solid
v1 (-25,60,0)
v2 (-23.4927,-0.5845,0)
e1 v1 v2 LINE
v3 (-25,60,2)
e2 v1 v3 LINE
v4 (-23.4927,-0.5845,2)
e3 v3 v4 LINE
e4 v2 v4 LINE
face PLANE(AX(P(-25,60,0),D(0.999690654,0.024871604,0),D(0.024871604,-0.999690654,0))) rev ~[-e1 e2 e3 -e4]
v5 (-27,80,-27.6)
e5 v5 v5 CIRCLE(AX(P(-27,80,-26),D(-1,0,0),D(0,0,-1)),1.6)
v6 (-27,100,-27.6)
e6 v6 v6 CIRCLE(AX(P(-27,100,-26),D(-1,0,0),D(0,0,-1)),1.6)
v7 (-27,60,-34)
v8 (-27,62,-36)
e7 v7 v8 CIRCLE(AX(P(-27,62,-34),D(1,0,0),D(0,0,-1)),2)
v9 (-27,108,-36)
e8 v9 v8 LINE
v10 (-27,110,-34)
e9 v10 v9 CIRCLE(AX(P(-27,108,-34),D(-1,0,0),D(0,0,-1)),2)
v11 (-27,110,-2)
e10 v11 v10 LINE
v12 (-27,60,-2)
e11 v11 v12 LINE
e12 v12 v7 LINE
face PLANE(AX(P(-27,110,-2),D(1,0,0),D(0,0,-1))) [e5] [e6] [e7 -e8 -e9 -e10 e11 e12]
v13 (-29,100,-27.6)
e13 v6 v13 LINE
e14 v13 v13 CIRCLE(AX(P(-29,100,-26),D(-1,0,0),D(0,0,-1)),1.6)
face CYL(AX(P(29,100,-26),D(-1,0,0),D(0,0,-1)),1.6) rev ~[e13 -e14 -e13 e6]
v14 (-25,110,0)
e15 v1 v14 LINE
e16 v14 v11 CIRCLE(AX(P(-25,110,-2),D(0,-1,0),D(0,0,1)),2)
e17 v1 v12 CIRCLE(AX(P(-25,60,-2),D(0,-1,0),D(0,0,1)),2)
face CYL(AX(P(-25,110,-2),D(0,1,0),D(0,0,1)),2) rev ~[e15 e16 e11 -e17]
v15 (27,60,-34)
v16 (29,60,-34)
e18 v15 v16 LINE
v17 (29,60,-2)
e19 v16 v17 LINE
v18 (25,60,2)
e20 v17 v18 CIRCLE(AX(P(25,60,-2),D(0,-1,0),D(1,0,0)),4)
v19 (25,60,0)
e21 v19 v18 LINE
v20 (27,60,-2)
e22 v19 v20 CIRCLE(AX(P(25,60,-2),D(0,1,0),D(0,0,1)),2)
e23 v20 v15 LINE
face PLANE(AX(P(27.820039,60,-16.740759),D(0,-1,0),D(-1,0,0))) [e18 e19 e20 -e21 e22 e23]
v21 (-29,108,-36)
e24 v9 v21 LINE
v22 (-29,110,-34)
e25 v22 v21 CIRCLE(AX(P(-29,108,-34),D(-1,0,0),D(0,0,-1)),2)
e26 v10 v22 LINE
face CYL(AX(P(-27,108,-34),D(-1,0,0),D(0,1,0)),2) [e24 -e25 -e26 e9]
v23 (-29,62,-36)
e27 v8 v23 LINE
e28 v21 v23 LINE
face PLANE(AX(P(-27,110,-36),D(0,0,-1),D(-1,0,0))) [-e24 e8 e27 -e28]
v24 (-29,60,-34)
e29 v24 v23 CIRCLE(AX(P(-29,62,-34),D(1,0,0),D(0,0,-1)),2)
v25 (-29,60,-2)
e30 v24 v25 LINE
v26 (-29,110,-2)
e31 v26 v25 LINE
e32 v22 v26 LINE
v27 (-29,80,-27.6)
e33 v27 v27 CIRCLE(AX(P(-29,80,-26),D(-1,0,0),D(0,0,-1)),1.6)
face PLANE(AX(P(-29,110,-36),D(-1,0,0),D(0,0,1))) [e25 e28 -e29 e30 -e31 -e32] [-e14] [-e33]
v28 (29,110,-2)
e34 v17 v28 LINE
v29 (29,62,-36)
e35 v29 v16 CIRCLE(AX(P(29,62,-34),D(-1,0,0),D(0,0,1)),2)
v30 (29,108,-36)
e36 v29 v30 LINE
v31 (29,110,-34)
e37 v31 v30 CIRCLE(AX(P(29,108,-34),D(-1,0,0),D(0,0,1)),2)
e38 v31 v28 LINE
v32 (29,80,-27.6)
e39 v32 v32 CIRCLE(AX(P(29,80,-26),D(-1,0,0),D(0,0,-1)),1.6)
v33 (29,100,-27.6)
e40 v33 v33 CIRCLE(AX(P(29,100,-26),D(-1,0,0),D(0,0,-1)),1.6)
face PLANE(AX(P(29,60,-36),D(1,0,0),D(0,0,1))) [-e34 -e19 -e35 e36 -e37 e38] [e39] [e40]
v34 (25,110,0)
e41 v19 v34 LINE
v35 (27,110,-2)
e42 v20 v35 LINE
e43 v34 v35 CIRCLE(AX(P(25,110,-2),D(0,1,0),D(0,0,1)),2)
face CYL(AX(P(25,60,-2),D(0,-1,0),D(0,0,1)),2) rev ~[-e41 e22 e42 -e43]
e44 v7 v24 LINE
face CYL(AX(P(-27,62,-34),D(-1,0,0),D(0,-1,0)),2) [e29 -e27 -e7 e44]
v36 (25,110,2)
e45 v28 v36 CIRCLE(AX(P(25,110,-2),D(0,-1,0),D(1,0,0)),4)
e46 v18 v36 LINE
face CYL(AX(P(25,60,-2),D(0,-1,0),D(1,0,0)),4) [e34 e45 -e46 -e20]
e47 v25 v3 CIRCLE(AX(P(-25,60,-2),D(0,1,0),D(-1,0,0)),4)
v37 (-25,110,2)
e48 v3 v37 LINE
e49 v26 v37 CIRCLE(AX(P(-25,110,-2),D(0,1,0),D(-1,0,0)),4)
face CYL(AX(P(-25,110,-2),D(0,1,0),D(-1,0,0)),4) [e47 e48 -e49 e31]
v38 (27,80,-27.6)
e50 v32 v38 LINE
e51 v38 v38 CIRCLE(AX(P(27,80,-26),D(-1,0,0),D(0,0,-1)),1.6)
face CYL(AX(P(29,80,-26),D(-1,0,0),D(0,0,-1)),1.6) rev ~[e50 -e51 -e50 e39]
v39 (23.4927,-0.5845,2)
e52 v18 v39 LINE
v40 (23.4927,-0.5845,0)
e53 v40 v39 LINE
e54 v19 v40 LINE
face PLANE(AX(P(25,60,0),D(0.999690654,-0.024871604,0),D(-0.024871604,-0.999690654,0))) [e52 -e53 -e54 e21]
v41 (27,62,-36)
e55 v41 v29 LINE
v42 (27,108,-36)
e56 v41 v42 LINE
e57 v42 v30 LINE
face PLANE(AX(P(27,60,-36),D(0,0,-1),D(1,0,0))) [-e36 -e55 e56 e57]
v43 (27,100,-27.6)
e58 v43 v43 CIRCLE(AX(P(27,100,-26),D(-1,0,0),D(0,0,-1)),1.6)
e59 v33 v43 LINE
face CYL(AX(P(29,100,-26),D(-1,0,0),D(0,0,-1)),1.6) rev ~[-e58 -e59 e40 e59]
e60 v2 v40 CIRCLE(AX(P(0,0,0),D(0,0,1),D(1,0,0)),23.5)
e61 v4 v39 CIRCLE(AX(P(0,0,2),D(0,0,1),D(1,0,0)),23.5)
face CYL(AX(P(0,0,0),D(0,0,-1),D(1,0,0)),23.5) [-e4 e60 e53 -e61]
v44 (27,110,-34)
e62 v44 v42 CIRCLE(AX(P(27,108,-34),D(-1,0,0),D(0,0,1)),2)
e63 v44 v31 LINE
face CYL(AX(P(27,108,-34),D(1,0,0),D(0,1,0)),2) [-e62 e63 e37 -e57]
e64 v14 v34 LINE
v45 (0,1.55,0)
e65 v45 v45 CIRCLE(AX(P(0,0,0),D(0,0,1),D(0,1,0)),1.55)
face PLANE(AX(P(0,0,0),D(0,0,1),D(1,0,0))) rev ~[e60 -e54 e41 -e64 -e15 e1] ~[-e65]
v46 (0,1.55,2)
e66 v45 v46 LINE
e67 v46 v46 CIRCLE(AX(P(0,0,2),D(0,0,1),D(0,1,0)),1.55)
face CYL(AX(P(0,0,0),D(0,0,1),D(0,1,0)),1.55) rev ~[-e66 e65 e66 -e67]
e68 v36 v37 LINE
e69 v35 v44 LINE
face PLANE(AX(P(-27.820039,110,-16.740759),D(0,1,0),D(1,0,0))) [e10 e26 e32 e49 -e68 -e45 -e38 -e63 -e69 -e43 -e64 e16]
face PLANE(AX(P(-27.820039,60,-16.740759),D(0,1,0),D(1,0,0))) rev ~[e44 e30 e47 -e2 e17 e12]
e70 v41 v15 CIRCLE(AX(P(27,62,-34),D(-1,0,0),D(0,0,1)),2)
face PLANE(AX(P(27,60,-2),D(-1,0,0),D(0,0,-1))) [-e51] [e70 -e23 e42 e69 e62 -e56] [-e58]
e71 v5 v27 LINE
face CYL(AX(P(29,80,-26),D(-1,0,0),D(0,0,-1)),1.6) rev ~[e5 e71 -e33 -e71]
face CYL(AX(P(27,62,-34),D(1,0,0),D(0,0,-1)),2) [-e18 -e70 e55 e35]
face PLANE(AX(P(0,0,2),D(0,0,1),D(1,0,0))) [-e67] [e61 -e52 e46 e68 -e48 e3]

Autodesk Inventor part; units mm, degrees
ref_plane "YZ Plane" through (0, 0, 0) normal (1, 0, 0) x (0, 1, 0)
ref_plane "XZ Plane" through (0, 0, 0) normal (0, 1, 0) x (-1, 0, 0)
ref_plane "XY Plane" through (0, 0, 0) normal (0, 0, 1) x (1, 0, 0)
sketch "スケッチ1" plane through (0, 0, 0) normal (0, 0, 1) x (1, 0, 0)
  circle A0 centre (0, 0) radius 23.5
  line L0 (0, 0) -> (0, 60)
  line L1 (0, 60) -> (25, 60)
  line L2 (25, 60) -> (25, 110)
  line L3 (25, 110) -> (0, 110)
  line L4 (0, 110) -> (0, 60)
  line L5 (25, 60) -> (23.4927, -0.5845)
  line L6 (0, 60) -> (-25, 60)
  line L7 (-25, 60) -> (-25, 110)
  line L8 (-25, 110) -> (0, 110)
  line L9 (-25, 60) -> (-23.4927, -0.5845)
  point P0 (-23.4927, -0.5845)
  dimension "d0" = 47
  dimension "d1" = 60
  dimension "d2" = 50
  dimension "d3" = 25
extrude "プレート1" add sketch "スケッチ1" along normal blind 2
sketch "スケッチ2" plane through (27, 60, -2) normal (1, 0, 0) x (0, 1, 0)
  line L0 (50, 0) -> (0, 0)
  line L1 (0, 0) -> (0, -34)
  line L2 (0, -34) -> (50, -34)
  line L3 (50, -34) -> (50, 0)
edge flange "フランジ1" height 38 angle 90 thickness 2 bend radius 2 thickness toward (1, 0, 0) relief tear relief width 2 relief depth 1 edges at (25, 85, 0) wall of the first edge with corners at (27, 110, -2) (27, 60, -2) (27, 60, -36) (27, 110, -36)
bend "曲げ1"
corner "コーナー1"
sketch "スケッチ3" plane through (-27, 110, -2) normal (-1, 0, 0) x (0, -1, 0)
  line L0 (50, 0) -> (0, 0)
  line L1 (0, 0) -> (0, -34)
  line L2 (0, -34) -> (50, -34)
  line L3 (50, -34) -> (50, 0)
edge flange "フランジ2" height 38 angle 90 thickness 2 bend radius 2 thickness toward (-1, 0, 0) relief tear relief width 2 relief depth 1 edges at (-25, 85, 0) wall of the first edge with corners at (-27, 60, -2) (-27, 110, -2) (-27, 110, -36) (-27, 60, -36)
bend "曲げ2"
corner "コーナー2"
sketch "スケッチ4" plane through (0, 0, 2) normal (0, 0, 1) x (1, 0, 0)
  circle A0 centre (0, 0) radius 10.1
  dimension "d25" = 20.2
extrude "押し出し1" [suppressed]
sketch "スケッチ5" plane through (0, 0, 2) normal (0, 0, 1) x (1, 0, 0)
  circle A0 centre (0, 0) radius 15.18
  point P0 (0, 15.18)
  point P1 (-13.1463, 7.59)
  point P2 (-13.1463, -7.59)
  point P3 (0, -15.18)
  point P4 (13.1463, -7.59)
  point P5 (13.1463, 7.59)
  dimension "d28" = 30.36
  dimension "d31" = 360
hole "穴1" [suppressed]
sketch "スケッチ6" plane through (29, 60, -36) normal (1, 0, 0) x (0, 0, -1)
  line L0 (0, 0) -> (0, 50) projected
  line L1 (0, 10) -> (-34, 10)
  line L2 (-34, 50) -> (-34, 0) projected
  line L3 (0, 0) -> (-34, 0) projected
  line L4 (0, 50) -> (-34, 50) projected
  line L5 (-10, 50) -> (-10, 10)
  point P0 (-36, -60)
  point P1 (-10, 20)
  point P2 (-10, 40)
  point P3 (-36, 50)
  dimension "d40" = 10
  dimension "d42" = 10
  dimension "d43" = 20
  dimension "d69" = 26
hole "穴2" at (29, 80, -26) at (29, 100, -26) direction (-1, 0, 0) diameter 3.2 end through all
sketch "スケッチ7" plane through (0, 0, 0) normal (0, 0, -1) x (-1, 0, 0)
  point P0 (0, 0)
  point P1 (0, 0)
hole "穴3" at (0, 0, 0) direction (0, 0, 1) diameter 3.1 end through all
sketch "スケッチ8" plane through (0, 0, 2) normal (0, 0, 1) x (1, 0, 0)
  line L0 (-15, 100) -> (15, 100)
  line L1 (15, 100) -> (15, 60)
  line L2 (15, 60) -> (-15, 60)
  line L3 (-15, 60) -> (-15, 100)
  line L4 (25, 110) -> (25, 60) projected
  line L5 (-25, 60) -> (-25, 110) projected
  line L6 (-25, 110) -> (25, 110) projected
  circle A0 centre (0, 0) radius 1.55 projected
  circle A1 centre (0, 0) radius 13.5
  line L7 (-14.4993, 40) -> (-13.4958, -0.3358)
  line L8 (-23.4927, -0.5845) -> (-25, 60) projected
  line L9 (13.4958, -0.3358) -> (14.4993, 40)
  line L10 (25, 60) -> (23.4927, -0.5845) projected
  line L11 (14.4993, 40) -> (-14.4993, 40)
  dimension "d58" = 10
  dimension "d59" = 10
  dimension "d60" = 10
  dimension "d61" = 40
  dimension "d63" = 10
  dimension "d64" = 20
extrude "押し出し2" [suppressed]
fillet "フィレット1" [suppressed]
fillet "フィレット2" radius 2 4 edges at (28, 60, -36) (28, 110, -36) (-28, 110, -36) (-28, 60, -36)
equation "\"d38\" = Thickness"
equation "\"d56\" = Thickness"
equation "\"d4\" = Thickness"
equation "\"d5\" = BendReliefWidth"
equation "\"d6\" = BendReliefDepth"
equation "\"d7\" = MinimumRemnant"
equation "\"d8\" = TransitionRadius"
equation "\"d11\" = BendRadius"
equation "\"d12\" = CornerReliefSize"
equation "\"d13\" = GapSize"
equation "\"d14\" = JacobiRadiusSize"
equation "\"d15\" = BendReliefWidth"
equation "\"d16\" = BendReliefDepth"
equation "\"d17\" = MinimumRemnant"
equation "\"d18\" = TransitionRadius"
equation "\"d21\" = BendRadius"
equation "\"d22\" = CornerReliefSize"
equation "\"d23\" = GapSize"
equation "\"d24\" = JacobiRadiusSize"
equation "\"BendRadius\" = Thickness"
equation "\"BendReliefWidth\" = Thickness"
equation "\"BendReliefDepth\" = 0.5 * Thickness"
equation "\"CornerReliefSize\" = 4 * Thickness"
equation "\"MinimumRemnant\" = 2 * Thickness"
equation "\"TransitionRadius\" = BendRadius"
equation "\"JacobiRadiusSize\" = BendRadius"
equation "\"GapSize\" = Thickness"
equation "\"Thickness\" = 2"
properties part number "servoplate2_forR3" material "アルミニウム 6061"
